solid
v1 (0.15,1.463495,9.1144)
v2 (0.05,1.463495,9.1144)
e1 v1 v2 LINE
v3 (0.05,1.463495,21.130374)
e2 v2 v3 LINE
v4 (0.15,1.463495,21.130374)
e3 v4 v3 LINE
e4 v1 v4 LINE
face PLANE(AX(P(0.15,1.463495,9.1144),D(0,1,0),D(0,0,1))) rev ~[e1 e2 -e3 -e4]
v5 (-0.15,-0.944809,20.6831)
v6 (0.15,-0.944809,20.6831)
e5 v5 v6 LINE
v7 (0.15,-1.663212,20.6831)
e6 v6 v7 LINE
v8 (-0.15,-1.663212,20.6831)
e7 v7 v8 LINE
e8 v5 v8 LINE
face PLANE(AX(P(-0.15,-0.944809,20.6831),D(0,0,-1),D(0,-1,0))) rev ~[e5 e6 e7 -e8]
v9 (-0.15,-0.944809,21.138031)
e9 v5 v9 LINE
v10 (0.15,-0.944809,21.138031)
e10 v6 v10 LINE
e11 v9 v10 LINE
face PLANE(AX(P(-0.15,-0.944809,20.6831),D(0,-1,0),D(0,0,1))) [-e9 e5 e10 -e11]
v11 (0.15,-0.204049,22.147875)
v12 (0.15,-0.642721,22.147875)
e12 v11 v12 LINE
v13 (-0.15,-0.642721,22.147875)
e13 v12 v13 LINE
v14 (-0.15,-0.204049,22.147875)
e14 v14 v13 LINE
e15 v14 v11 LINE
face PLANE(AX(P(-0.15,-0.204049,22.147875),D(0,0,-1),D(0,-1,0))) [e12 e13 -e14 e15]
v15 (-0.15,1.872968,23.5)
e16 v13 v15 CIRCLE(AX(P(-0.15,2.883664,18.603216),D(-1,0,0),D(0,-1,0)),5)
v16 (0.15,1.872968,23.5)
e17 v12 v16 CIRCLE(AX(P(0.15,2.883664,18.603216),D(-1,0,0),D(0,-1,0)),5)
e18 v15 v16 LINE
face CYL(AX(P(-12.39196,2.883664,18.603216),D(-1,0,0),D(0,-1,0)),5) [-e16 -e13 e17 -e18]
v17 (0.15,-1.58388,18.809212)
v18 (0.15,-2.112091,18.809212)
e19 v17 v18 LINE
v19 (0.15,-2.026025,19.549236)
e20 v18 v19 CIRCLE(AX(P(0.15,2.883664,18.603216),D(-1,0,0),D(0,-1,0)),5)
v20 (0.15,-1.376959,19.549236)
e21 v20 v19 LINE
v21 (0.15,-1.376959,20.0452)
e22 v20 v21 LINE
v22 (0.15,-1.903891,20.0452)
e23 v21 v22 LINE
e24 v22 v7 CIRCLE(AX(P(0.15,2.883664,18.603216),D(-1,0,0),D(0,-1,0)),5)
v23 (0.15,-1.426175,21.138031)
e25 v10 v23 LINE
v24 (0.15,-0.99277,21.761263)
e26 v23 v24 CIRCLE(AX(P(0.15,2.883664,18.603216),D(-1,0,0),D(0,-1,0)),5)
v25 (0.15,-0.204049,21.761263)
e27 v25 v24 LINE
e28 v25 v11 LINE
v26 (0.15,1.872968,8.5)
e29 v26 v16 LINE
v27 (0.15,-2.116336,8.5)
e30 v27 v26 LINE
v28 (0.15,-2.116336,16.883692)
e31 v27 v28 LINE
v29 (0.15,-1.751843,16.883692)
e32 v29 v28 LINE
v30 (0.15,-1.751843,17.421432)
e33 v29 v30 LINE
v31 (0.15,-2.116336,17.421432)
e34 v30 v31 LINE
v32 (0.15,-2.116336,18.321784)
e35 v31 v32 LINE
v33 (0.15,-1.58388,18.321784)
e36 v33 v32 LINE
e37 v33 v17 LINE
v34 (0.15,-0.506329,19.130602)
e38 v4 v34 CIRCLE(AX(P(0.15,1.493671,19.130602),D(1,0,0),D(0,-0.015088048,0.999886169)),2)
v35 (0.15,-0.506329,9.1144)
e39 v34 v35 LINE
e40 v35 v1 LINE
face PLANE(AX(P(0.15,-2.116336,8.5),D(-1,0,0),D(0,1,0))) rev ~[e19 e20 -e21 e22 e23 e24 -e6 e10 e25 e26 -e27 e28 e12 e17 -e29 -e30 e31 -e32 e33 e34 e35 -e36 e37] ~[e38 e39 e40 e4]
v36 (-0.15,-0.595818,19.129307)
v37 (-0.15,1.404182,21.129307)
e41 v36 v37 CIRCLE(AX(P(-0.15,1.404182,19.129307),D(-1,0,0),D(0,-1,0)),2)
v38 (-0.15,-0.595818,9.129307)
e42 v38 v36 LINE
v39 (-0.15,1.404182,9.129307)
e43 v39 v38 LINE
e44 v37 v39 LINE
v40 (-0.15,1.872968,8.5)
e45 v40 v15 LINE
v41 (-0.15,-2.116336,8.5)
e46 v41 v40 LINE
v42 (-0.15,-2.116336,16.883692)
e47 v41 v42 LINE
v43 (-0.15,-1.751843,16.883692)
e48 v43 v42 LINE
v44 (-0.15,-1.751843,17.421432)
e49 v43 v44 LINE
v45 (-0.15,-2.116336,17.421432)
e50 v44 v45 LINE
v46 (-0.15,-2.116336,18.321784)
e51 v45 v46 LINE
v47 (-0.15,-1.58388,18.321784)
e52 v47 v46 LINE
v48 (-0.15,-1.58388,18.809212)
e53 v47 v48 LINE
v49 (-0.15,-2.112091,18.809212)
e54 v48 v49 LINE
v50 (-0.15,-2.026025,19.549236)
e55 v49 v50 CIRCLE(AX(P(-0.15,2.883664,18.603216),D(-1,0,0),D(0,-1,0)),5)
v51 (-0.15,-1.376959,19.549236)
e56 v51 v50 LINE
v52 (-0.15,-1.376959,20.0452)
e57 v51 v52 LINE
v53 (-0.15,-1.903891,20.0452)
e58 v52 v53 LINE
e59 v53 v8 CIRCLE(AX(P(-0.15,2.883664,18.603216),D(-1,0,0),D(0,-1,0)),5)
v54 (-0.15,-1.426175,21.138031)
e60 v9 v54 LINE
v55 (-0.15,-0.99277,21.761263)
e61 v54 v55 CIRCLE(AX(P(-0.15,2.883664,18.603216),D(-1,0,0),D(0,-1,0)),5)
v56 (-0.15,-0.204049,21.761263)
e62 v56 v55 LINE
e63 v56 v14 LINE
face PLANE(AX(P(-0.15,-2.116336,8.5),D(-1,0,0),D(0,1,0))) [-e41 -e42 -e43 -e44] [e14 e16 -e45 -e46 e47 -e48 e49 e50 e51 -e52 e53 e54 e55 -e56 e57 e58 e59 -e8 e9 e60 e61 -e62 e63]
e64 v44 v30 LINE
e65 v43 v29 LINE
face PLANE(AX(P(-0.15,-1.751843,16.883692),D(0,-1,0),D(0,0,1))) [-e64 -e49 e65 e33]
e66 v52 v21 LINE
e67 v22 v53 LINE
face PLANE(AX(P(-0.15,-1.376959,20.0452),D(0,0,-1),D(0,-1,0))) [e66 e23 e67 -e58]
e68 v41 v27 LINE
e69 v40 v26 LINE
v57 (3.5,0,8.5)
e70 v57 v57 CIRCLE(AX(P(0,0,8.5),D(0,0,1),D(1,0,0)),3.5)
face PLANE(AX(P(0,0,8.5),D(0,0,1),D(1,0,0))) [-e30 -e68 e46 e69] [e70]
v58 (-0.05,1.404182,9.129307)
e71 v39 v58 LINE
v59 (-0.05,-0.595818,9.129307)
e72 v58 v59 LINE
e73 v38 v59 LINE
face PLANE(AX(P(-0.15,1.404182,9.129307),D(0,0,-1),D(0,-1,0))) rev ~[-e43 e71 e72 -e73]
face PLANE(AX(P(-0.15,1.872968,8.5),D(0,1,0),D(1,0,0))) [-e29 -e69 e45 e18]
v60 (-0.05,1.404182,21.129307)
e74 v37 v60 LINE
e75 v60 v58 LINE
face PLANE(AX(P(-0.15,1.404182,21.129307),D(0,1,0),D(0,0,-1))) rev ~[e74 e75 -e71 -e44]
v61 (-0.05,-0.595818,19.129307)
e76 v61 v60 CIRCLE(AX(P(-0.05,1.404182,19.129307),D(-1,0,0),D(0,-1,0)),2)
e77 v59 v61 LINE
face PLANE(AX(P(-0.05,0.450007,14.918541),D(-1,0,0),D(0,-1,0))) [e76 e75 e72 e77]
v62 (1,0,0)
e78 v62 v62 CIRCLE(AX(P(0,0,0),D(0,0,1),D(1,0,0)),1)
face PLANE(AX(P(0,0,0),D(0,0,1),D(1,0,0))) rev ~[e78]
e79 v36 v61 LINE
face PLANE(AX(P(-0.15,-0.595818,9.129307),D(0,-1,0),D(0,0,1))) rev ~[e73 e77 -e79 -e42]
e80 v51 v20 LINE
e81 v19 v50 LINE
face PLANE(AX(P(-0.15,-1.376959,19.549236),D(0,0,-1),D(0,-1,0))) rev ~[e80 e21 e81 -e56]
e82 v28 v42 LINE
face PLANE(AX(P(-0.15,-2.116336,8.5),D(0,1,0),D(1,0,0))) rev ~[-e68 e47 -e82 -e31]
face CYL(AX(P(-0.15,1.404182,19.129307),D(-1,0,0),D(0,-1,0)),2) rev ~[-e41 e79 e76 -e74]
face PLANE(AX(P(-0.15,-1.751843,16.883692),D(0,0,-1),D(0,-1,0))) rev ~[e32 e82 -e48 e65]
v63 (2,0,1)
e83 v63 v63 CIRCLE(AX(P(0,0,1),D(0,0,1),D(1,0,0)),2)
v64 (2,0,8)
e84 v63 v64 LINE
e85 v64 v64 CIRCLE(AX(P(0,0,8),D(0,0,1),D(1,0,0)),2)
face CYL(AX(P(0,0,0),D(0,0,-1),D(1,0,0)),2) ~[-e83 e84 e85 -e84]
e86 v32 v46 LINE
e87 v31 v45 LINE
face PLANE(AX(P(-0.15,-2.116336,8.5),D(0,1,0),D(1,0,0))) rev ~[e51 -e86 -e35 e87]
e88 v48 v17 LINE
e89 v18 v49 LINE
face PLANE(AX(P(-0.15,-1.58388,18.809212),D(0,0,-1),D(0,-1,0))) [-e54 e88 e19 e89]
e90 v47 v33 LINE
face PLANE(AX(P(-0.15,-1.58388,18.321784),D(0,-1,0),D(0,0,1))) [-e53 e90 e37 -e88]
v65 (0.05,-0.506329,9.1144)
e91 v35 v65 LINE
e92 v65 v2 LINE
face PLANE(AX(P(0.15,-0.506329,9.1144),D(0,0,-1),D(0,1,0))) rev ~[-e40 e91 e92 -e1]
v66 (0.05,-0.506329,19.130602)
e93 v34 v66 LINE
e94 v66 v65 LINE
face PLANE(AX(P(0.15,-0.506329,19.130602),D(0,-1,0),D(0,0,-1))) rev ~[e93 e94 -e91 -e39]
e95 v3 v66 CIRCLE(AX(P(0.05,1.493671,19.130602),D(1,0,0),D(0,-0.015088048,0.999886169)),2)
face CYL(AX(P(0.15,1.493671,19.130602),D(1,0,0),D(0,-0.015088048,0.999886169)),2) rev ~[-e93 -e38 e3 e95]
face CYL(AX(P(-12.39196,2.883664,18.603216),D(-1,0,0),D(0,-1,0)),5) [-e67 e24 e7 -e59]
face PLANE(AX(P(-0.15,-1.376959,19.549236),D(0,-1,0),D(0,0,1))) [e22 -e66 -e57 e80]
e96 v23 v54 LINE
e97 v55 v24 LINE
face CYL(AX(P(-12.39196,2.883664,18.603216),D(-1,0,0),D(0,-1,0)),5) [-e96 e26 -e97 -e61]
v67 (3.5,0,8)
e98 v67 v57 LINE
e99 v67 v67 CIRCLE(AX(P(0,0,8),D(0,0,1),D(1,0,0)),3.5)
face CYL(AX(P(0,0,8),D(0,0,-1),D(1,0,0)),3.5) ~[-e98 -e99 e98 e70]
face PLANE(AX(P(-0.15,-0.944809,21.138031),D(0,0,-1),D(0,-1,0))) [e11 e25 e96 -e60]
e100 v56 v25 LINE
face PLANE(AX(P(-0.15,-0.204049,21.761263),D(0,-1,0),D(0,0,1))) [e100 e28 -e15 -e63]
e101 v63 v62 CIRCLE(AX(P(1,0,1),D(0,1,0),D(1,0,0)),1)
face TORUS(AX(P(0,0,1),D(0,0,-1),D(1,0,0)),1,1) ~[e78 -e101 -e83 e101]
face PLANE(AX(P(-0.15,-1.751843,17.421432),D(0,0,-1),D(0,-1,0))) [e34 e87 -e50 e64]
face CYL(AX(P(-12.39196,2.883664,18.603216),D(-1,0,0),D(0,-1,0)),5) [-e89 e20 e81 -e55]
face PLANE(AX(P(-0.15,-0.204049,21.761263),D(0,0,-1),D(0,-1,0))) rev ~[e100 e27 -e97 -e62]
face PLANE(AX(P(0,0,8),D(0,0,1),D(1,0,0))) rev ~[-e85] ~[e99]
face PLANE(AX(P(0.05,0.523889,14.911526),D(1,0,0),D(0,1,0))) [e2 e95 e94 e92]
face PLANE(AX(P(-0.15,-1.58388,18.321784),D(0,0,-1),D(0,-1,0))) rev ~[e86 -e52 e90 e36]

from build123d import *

# Parameters (mm, degrees)
F0_R        = 2
F1_DEPTH    = 8
F2_R        = 3.5
F2_R_2      = 2
F3_DEPTH    = 0.5
F4_W        = 0.3
F4_H        = 3.9893038338
F5_DEPTH    = 15
F6_T1_DEPTH = 24.7839198555
F7_R        = 1
F8_W        = 1.6560796648
F8_H        = 0.4959646612
F8_W_2      = 1.2781426776
F8_H_2      = 0.4874281585
F8_W_3      = 1.2889747159
F8_H_3      = 0.4549305886
F8_W_4      = 0.7887214828
F8_H_4      = 0.3866125997
F8_W_5      = 1.2771316105
F8_H_5      = 0.5377400666
F9_DEPTH    = 0.3
F11_DEPTH   = 0.1
F13_DEPTH   = 0.1


# Not quite as in the source:
# - a fillet or chamfer that OpenCascade refuses, or shapes differently, is made with other operations: its cross-section is extruded or revolved along the edge and cut away or added


with BuildPart() as f1:
    # F0 (on Top) → F1 (new body)
    with BuildSketch(Plane.XY):
        Circle(F0_R)
    extrude(amount=F1_DEPTH)

    # F2 (on face) → F3 (join)
    with BuildSketch(Plane.XY.offset(8)):
        Circle(F2_R)
        Circle(F2_R_2, mode=Mode.SUBTRACT)
        Circle(F2_R_2)
    extrude(amount=F3_DEPTH)

    # F4 (on face) → F5 (join)
    with BuildSketch(Plane.XY.offset(8.5)):
        with Locations((0, -0.1216841047)):
            Rectangle(F4_W, F4_H)
    extrude(amount=F5_DEPTH)

    # F6: fillet of radius 5 on 1 edges, made by hand

    # F6_s2 → F6_t1 (cut)
    with BuildSketch(Plane.YZ.offset(-12.3919599278)):
        with BuildLine():
            ThreePointArc((-2.1163360216, 18.6032160289), (-0.9927700034, 21.7612628279), (1.8729678122, 23.5))
            Line((1.8729678122, 23.5), (-2.1163360216, 23.5))
            Line((-2.1163360216, 23.5), (-2.1163360216, 18.6032160289))
        make_face()
    extrude(amount=F6_T1_DEPTH, mode=Mode.SUBTRACT)

    # F7
    f7_edges = [f1.edges().sort_by_distance(p)[0] for p in [
        (-2, 0, 0),
    ]]
    fillet(f7_edges, radius=F7_R)

    # F8 (on face) → F9 (cut)
    with BuildSketch(Plane(origin=(-0.15, 0, 0), x_dir=(0, -1, 0), z_dir=(-1, 0, 0))):
        with Locations((2.2049986292, 19.7972180322)):
            Rectangle(F8_W, F8_H)
        with Locations((2.2229513852, 18.5654982924)):
            Rectangle(F8_W_2, F8_H_2)
        with Locations((1.5892958909, 20.9105657414)):
            Rectangle(F8_W_3, F8_H_3)
        with Locations((0.598409262, 21.9545691277)):
            Rectangle(F8_W_4, F8_H_4)
        with Locations((2.3904092959, 17.1525618061)):
            Rectangle(F8_W_5, F8_H_5)
    extrude(amount=-F9_DEPTH, mode=Mode.SUBTRACT)

    # F10 (on face) → F11 (cut)
    with BuildSketch(Plane(origin=(-0.15, 0, 0), x_dir=(0, -1, 0), z_dir=(-1, 0, 0))):
        with BuildLine():
            Line((-1.4041818934, 21.1293072328), (-1.4041818934, 9.1293072328))
            Line((-1.4041818934, 9.1293072328), (0.5958181066, 9.1293072328))
            Line((0.5958181066, 9.1293072328), (0.5958181066, 19.1293072328))
            ThreePointArc((0.5958181066, 19.1293072328), (0.010031669, 20.5435207952), (-1.4041818934, 21.1293072328))
        make_face()
    extrude(amount=-F11_DEPTH, mode=Mode.SUBTRACT)

    # F12 (on face) → F13 (cut)
    with BuildSketch(Plane.YZ.offset(0.15)):
        with BuildLine():
            Line((-0.5063290591, 9.1143995523), (1.4634948457, 9.1143995523))
            Line((1.4634948457, 9.1143995523), (1.4634948457, 21.1303744976))
            ThreePointArc((1.4634948457, 21.1303744976), (0.06882846, 20.5341063118), (-0.5063290591, 19.1306021597))
            Line((-0.5063290591, 19.1306021597), (-0.5063290591, 9.1143995523))
        make_face()
    extrude(amount=-F13_DEPTH, mode=Mode.SUBTRACT)


solid = f1.part
